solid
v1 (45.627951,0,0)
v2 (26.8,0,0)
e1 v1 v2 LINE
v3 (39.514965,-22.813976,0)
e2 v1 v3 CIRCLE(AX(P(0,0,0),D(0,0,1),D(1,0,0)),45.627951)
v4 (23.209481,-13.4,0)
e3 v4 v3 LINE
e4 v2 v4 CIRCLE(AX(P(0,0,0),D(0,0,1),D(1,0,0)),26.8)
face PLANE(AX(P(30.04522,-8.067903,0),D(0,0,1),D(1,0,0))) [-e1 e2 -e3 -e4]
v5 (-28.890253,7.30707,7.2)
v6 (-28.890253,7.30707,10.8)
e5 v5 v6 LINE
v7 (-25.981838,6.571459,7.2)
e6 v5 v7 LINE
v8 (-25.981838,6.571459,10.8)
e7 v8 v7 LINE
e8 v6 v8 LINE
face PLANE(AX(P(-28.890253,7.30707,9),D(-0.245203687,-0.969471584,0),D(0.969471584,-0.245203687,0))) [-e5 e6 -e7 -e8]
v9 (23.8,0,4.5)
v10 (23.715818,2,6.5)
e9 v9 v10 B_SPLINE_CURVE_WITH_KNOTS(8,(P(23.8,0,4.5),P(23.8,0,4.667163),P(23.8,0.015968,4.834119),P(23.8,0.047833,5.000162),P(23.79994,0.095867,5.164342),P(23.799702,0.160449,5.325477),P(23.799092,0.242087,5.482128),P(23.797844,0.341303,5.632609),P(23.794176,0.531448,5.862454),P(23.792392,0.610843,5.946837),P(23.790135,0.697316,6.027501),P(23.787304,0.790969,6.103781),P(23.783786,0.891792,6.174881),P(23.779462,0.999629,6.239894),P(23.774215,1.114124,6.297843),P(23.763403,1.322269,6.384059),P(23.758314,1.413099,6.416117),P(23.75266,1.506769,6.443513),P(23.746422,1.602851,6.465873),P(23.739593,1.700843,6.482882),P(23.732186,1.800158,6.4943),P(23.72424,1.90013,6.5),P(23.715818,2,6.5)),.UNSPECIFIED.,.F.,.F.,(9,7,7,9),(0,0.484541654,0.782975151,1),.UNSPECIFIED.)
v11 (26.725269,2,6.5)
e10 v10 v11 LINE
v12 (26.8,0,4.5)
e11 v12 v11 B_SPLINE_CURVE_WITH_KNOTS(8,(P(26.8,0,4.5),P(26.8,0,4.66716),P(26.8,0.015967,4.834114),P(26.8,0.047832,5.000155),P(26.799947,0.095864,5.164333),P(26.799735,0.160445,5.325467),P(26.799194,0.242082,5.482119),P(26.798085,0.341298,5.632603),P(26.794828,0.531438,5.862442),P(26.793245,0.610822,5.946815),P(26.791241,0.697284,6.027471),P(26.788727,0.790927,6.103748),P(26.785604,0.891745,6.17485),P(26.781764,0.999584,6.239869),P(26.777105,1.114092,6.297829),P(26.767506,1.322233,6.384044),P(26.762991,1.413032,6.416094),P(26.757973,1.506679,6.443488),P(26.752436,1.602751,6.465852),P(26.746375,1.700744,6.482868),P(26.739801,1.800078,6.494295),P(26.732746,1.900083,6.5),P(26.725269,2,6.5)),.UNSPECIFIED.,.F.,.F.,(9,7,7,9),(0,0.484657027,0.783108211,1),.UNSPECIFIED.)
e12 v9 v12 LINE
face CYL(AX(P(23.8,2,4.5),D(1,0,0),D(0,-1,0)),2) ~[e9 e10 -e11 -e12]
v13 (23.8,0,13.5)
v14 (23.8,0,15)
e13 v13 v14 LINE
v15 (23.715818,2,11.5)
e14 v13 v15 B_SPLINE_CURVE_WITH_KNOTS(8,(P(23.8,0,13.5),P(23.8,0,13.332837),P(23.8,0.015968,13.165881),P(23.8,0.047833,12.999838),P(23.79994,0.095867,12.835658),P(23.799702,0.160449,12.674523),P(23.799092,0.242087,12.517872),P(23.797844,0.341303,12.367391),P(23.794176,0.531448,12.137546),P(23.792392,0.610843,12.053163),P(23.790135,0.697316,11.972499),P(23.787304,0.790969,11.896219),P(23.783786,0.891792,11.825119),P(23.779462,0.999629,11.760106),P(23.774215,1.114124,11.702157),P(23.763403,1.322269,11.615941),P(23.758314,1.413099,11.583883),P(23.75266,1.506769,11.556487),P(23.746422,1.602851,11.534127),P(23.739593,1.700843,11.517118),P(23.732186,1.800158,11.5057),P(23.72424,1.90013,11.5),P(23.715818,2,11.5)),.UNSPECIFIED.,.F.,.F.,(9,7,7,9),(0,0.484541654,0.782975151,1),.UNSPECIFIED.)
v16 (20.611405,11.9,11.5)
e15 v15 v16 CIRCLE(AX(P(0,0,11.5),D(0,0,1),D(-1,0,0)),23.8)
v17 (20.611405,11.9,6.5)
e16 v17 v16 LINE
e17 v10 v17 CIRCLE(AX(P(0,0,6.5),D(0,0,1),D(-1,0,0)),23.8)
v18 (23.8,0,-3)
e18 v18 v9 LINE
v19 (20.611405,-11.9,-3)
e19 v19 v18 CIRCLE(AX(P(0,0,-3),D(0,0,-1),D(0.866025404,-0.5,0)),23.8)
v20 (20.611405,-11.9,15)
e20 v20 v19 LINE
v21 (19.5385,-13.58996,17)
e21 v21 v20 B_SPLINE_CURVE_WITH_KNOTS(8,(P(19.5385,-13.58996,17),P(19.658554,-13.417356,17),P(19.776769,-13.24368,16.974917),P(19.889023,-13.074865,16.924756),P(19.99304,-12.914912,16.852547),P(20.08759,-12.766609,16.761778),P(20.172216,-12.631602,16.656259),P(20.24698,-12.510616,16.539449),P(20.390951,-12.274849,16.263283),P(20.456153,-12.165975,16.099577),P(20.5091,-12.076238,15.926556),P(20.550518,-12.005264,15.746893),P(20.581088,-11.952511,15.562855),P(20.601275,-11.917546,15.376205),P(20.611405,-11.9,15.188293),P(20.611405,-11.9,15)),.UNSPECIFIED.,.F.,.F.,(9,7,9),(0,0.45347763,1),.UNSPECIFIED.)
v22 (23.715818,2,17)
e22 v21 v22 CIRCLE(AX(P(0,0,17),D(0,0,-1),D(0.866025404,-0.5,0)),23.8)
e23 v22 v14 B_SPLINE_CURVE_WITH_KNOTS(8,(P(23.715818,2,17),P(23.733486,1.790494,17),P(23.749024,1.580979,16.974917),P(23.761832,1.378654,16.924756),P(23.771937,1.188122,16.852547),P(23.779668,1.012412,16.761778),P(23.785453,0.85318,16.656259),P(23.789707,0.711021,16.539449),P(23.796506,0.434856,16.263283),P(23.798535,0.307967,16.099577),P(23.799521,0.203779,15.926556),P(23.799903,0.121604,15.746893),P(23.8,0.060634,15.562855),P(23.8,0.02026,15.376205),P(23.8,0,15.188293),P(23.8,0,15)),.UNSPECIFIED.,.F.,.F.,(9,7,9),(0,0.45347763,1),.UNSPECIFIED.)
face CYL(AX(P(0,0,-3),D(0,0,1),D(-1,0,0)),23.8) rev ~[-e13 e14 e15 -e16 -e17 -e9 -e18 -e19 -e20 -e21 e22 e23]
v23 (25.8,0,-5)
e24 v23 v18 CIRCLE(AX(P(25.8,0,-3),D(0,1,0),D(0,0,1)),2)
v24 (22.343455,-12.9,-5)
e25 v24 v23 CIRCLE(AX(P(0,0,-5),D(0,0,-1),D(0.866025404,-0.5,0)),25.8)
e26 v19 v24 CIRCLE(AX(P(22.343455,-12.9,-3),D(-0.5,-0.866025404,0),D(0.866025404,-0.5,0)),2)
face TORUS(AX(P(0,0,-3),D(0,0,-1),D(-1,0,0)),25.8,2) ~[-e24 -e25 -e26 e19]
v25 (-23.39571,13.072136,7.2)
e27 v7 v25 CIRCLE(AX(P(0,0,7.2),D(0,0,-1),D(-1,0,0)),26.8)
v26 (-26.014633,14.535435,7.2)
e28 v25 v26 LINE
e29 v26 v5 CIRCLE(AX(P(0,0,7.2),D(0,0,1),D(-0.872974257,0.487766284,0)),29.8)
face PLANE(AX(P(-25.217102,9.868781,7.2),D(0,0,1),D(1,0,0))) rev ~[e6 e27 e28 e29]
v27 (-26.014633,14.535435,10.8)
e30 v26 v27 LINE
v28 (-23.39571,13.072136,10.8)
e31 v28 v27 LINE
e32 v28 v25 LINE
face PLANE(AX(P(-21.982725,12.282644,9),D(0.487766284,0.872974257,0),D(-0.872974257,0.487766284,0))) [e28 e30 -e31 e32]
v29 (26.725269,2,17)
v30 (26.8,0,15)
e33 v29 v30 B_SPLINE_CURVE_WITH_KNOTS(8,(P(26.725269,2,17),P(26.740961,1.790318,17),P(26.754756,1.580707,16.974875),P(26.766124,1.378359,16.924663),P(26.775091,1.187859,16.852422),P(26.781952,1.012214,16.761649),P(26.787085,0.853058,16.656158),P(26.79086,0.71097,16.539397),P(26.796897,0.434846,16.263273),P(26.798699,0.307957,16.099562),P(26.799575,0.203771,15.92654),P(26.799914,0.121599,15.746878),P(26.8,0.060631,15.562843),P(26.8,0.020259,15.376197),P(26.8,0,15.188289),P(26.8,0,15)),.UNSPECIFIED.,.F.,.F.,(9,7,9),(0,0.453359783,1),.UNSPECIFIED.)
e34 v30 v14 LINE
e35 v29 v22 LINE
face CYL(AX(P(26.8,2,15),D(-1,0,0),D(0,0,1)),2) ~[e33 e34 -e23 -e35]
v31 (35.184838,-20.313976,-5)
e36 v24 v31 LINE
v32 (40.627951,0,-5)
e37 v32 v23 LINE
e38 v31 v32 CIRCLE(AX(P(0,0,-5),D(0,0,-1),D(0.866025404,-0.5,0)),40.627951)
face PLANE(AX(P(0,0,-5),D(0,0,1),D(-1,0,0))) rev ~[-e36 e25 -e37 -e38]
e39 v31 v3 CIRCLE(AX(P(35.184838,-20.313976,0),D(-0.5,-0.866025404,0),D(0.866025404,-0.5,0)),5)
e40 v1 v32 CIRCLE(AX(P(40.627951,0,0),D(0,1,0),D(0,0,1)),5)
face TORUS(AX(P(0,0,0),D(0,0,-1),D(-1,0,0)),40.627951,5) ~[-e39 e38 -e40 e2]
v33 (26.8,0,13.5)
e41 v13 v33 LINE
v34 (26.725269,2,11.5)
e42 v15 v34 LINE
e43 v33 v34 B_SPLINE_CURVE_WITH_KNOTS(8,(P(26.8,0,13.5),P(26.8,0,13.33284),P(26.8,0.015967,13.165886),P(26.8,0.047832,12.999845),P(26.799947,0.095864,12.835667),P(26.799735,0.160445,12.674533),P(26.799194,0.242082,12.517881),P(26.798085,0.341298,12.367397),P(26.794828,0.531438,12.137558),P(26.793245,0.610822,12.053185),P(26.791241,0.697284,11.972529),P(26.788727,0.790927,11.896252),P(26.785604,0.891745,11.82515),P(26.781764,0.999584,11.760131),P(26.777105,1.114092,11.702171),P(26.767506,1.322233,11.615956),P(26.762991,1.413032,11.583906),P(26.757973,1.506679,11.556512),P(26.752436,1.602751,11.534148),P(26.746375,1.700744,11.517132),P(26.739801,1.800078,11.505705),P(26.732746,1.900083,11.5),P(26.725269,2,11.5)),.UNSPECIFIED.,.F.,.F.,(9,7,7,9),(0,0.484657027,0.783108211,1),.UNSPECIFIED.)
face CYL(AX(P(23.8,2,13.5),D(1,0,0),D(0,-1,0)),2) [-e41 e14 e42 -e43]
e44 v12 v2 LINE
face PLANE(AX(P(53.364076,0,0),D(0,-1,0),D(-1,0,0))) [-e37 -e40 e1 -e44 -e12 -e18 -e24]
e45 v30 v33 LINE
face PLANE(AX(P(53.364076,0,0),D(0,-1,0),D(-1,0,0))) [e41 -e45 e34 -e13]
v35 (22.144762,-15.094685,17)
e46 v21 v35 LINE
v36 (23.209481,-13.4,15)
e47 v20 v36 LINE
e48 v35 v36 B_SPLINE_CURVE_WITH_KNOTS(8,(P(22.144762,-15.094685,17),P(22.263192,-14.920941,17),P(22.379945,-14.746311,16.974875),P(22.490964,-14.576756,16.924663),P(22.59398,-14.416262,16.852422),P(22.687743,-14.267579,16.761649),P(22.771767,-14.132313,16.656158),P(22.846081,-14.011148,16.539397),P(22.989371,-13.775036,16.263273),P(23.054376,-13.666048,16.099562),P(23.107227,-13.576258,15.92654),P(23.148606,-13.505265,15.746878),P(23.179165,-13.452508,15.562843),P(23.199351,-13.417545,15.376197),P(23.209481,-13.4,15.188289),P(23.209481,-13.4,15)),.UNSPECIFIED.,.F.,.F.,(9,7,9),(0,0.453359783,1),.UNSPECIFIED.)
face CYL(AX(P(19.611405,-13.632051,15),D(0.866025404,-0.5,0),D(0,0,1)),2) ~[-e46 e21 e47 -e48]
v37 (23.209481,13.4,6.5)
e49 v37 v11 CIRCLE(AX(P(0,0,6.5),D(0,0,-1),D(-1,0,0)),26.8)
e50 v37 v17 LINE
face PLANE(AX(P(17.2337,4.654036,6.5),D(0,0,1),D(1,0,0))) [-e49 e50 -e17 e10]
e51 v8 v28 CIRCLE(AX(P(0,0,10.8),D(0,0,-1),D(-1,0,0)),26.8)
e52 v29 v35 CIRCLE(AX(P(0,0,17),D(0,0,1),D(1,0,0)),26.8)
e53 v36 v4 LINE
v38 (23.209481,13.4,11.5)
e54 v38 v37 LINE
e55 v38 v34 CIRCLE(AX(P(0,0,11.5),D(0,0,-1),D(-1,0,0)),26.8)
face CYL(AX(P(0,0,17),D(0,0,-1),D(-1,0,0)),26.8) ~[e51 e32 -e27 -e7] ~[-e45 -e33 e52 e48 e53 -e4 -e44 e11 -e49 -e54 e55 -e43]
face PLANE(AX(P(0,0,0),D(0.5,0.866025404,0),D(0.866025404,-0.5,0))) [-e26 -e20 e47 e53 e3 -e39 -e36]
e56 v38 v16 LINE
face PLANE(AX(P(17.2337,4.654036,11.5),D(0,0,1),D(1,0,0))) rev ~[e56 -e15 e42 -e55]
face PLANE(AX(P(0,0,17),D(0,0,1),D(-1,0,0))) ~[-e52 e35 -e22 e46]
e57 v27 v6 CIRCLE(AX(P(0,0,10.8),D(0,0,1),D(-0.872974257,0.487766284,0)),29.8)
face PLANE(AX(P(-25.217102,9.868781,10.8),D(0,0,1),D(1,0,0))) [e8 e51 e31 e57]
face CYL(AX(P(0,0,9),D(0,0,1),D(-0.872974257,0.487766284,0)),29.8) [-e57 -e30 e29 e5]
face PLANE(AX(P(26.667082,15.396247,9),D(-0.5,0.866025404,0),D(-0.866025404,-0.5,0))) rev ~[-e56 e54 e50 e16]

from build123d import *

# Parameters (mm, degrees)
F3_DEPTH      = 17.001
F3_DEPTH_BACK = 25
F6_DEPTH      = 2.5
F7_R          = 2
F8_DEPTH      = 1.8


with BuildPart() as f1:
    # F0 (on Front) → F1 (revolve)
    with BuildSketch(Plane.XZ):
        with BuildLine():
            Line((-23.8, 17), (-26.8, 17))
            Line((-26.8, 17), (-26.8, 0))
            Line((-26.8, 0), (-45.6279513852, 0))
            ThreePointArc((-45.6279513852, 0), (-44.1634852911, -3.5355339059), (-40.6279513852, -5))
            Line((-40.6279513852, -5), (-25.8, -5))
            ThreePointArc((-25.8, -5), (-24.3857864376, -4.4142135624), (-23.8, -3))
            Line((-23.8, -3), (-23.8, 17))
        make_face()
    revolve(axis=Axis((0, 0, 7.2955568321), (0, 0, 1)))

    # F2 (on Top) → F3 (cut, two sides)
    with BuildSketch(Plane.XY) as f3_sk:
        Polygon((53.3640757203, 0), (0, 0), (46.3265438035, -26.7466425355), align=None)
    extrude(amount=F3_DEPTH, mode=Mode.SUBTRACT)
    extrude(f3_sk.sketch, amount=-F3_DEPTH_BACK, mode=Mode.SUBTRACT)

    # F5 (on offset) → F6 (cut, symmetric)
    with BuildSketch(Plane.XY.offset(9)):
        Polygon((26.6670817875, 15.3962468485), (0, 0), (30.5216945708, 0), align=None)
    extrude(amount=F6_DEPTH, both=True, mode=Mode.SUBTRACT)

    # F7
    f7_edges = [f1.edges().sort_by_distance(p)[0] for p in [
        (21.910443, -12.65, 17),
        (25.3, 0, 17),
        (25.3, 0, 11.5),
        (25.3, 0, 6.5),
    ]]
    fillet(f7_edges, radius=F7_R)

    # F5 (on offset) → F8 (join, symmetric)
    with BuildSketch(Plane.XY.offset(9)):
        with BuildLine():
            Line((-21.9827251313, 12.2826441446), (-26.0146328451, 14.535435251))
            ThreePointArc((-26.0146328451, 14.535435251), (-27.6893290703, 11.0154916202), (-28.8902531983, 7.3070698737))
            Line((-28.8902531983, 7.3070698737), (-23.0896898866, 5.8399618793))
            Line((-23.0896898866, 5.8399618793), (-21.9827251313, 12.2826441446))
        make_face()
    extrude(amount=F8_DEPTH, both=True)


solid = f1.part
